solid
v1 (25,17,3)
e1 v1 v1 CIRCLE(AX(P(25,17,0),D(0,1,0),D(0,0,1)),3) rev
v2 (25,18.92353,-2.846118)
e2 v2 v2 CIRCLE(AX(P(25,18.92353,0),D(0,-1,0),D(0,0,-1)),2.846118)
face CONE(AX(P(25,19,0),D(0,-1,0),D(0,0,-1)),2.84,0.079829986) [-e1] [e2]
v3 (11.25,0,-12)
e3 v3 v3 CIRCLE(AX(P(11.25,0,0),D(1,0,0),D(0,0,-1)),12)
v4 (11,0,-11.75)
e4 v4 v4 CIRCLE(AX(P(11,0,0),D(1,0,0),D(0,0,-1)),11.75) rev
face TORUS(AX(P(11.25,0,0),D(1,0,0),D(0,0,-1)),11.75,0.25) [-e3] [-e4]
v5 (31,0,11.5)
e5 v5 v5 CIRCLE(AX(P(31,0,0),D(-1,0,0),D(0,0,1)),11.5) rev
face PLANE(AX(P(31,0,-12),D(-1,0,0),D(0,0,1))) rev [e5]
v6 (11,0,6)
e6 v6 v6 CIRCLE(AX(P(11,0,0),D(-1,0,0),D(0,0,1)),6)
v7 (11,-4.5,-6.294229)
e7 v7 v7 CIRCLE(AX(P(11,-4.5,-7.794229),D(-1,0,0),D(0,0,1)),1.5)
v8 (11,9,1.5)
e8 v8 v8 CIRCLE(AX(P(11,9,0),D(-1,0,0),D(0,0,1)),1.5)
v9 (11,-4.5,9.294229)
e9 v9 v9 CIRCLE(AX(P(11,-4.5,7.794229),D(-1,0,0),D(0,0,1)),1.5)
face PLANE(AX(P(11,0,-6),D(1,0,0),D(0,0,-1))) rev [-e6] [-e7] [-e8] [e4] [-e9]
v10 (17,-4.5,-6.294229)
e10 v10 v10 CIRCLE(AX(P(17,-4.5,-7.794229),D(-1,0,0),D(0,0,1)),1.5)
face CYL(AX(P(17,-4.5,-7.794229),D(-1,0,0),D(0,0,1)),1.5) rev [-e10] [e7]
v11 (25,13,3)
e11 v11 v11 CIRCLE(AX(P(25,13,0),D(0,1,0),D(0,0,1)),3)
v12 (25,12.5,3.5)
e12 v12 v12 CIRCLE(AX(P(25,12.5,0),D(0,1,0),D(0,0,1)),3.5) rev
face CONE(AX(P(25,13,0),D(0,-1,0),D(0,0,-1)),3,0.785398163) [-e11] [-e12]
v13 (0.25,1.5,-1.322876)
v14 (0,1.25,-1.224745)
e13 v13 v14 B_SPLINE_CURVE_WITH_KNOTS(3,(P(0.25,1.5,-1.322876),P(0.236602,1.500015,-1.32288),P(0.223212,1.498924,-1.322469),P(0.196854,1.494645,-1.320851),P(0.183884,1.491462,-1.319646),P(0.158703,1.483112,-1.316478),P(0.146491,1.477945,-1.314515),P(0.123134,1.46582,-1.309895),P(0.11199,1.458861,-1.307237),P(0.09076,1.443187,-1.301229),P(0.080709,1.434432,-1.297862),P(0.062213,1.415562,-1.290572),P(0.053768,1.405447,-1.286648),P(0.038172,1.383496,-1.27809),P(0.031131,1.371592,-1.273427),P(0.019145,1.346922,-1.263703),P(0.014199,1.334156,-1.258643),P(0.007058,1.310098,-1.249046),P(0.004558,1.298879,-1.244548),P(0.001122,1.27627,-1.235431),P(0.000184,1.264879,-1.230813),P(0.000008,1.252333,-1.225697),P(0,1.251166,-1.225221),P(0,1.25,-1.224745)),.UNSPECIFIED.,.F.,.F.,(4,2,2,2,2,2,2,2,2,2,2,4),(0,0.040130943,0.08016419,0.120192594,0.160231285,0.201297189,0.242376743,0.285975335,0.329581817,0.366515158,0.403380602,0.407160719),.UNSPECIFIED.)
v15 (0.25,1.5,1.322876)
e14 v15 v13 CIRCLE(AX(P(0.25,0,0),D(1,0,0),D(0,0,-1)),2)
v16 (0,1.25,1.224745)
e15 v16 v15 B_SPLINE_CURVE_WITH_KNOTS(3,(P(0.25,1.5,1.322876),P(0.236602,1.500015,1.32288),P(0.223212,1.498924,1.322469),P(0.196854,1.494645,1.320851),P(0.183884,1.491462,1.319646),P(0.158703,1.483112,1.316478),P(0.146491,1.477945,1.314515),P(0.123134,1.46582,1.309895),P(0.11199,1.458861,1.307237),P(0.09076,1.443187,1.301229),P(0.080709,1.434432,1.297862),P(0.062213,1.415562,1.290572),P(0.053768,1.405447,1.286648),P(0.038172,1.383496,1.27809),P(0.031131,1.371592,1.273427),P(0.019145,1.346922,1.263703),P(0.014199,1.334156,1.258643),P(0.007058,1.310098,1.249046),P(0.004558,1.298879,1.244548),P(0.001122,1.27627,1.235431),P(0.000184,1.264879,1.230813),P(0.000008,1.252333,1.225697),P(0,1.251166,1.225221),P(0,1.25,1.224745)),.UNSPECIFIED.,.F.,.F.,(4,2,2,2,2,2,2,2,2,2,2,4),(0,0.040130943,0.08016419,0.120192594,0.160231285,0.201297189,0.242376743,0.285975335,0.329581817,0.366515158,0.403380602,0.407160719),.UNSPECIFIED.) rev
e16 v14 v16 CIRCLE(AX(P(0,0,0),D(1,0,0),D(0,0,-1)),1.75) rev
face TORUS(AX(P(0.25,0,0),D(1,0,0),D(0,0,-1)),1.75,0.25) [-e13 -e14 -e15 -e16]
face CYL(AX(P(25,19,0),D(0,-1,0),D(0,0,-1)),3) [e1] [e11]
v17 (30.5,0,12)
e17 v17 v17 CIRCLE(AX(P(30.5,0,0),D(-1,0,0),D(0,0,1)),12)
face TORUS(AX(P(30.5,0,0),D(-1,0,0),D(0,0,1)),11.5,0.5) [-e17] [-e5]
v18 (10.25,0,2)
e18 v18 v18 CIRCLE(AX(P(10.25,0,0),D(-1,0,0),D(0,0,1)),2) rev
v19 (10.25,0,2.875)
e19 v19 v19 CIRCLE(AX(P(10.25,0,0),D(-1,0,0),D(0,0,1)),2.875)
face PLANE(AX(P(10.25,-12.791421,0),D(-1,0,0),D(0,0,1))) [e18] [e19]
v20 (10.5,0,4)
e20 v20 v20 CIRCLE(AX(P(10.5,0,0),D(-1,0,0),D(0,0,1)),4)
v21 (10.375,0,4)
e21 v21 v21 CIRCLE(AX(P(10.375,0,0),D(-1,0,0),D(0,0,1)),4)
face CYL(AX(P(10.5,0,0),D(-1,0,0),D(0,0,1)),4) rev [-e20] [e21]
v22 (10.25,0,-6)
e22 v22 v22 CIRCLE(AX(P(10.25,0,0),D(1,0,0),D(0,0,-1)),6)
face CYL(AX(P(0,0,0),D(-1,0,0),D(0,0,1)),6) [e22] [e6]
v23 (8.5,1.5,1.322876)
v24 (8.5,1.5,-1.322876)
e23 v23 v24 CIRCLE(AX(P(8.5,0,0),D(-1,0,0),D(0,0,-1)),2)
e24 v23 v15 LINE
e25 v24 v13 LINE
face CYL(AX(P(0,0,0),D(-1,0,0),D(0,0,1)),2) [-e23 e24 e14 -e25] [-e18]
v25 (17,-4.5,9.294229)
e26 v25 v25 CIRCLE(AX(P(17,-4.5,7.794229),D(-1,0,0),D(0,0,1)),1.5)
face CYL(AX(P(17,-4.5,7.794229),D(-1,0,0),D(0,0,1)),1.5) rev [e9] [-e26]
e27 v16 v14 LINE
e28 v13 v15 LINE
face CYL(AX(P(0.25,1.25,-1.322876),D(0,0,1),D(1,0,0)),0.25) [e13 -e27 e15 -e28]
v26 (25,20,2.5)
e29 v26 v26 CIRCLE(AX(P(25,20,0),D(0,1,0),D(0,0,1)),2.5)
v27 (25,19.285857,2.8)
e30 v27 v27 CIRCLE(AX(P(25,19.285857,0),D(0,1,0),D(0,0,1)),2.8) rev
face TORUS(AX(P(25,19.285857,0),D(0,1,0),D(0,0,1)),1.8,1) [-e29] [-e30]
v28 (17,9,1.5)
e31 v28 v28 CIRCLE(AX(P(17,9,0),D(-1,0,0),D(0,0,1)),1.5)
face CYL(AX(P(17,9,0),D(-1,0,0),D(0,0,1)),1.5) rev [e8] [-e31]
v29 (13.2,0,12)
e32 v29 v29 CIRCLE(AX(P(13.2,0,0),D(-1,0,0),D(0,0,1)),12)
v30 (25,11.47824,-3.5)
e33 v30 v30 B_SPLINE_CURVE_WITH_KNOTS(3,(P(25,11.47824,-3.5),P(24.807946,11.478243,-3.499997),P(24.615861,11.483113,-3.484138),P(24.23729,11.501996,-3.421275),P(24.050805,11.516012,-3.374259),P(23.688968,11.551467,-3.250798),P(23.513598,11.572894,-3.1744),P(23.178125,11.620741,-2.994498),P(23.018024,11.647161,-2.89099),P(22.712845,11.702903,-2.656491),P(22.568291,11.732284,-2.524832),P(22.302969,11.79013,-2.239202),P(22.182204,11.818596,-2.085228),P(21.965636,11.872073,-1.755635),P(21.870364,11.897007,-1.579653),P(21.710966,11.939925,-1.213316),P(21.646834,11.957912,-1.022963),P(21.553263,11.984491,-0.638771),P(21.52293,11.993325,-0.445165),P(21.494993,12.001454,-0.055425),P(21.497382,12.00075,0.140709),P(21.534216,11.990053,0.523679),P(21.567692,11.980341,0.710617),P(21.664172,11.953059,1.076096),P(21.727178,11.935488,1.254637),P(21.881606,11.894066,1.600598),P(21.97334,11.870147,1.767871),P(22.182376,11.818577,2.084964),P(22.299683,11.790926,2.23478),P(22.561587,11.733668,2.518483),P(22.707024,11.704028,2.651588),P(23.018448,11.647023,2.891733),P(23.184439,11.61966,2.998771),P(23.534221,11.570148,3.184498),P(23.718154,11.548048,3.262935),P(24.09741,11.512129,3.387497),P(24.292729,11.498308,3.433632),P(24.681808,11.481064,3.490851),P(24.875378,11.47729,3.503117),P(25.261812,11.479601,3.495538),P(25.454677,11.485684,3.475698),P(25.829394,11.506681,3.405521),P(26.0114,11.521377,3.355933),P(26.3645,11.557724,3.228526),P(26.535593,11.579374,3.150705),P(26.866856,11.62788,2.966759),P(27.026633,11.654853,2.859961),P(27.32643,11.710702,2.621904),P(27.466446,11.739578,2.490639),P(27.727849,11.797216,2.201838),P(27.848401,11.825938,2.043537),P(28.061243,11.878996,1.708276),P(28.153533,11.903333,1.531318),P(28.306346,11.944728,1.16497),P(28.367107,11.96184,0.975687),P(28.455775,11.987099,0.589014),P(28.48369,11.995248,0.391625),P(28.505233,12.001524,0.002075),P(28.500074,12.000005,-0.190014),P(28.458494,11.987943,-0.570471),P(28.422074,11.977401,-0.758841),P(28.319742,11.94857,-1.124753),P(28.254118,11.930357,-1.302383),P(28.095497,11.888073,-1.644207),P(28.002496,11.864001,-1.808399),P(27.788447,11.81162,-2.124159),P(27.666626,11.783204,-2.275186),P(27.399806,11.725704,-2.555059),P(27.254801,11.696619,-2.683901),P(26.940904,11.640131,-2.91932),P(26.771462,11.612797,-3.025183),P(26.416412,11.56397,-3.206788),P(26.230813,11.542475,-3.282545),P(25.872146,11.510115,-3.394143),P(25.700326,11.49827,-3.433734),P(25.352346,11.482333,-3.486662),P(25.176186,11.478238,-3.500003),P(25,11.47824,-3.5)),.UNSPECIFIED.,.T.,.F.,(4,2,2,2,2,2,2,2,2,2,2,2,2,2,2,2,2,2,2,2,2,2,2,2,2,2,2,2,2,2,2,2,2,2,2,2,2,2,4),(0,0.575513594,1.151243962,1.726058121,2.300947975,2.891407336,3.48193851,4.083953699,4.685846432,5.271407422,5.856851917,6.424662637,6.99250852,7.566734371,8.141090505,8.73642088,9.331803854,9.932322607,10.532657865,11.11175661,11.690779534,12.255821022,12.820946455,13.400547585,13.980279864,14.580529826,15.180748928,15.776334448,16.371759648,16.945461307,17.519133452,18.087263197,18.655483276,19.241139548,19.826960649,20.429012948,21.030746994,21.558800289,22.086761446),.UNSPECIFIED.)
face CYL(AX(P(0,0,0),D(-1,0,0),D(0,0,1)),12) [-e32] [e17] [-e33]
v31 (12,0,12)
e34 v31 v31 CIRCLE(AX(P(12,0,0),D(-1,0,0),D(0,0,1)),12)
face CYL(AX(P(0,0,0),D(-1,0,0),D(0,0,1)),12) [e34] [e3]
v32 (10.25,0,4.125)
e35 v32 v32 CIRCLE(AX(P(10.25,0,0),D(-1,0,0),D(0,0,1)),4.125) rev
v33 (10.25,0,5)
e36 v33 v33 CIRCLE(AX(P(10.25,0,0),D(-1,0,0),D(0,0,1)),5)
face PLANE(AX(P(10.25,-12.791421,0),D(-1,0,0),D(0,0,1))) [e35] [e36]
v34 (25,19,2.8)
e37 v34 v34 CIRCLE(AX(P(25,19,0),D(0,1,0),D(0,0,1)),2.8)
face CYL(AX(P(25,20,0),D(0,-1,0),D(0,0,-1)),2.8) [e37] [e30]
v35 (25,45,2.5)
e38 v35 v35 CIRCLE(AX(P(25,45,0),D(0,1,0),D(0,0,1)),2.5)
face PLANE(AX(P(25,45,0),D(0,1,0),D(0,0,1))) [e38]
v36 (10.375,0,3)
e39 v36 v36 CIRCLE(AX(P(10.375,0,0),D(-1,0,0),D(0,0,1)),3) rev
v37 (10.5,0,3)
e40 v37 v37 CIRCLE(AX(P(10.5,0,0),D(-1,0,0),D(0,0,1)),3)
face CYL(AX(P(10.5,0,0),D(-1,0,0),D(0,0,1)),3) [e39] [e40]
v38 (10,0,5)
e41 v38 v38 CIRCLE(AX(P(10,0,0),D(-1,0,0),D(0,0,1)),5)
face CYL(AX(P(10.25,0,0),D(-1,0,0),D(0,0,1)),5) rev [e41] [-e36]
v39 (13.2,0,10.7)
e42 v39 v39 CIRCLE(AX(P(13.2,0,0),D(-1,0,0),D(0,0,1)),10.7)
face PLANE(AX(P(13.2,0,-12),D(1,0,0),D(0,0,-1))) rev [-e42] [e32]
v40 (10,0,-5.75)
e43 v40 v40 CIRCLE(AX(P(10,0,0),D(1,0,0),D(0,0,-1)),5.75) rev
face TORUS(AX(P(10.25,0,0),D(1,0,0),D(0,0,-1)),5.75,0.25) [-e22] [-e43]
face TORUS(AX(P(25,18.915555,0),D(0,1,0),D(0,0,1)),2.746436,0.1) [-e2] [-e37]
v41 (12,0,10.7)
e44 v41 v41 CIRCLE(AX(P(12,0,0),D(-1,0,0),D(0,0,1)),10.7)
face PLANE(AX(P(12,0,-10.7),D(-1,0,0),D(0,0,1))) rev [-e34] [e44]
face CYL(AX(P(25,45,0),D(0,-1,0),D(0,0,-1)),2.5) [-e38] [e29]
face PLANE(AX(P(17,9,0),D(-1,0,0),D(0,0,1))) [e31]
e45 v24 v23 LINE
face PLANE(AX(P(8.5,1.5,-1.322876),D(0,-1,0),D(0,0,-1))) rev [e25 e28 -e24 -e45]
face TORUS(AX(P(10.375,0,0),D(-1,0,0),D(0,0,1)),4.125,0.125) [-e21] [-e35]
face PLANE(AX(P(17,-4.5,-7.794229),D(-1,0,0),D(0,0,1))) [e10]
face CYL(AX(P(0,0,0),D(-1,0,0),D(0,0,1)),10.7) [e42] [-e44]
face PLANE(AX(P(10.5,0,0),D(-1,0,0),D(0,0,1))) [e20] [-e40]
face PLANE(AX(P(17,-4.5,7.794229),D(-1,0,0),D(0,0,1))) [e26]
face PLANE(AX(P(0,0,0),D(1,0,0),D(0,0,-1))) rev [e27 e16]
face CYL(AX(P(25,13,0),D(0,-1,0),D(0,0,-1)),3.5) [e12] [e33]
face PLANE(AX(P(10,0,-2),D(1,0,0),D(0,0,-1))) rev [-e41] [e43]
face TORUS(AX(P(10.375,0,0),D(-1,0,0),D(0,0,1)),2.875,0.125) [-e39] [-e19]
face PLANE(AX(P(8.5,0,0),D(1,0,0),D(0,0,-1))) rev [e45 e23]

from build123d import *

# Parameters (mm, degrees)
ESQUISSE2_R             = 3.5
BOSS_EXTRU_1_DEPTH      = 13
ESQUISSE3_R             = 3
BOSS_EXTRU_2_DEPTH      = 6
ESQUISSE4_R             = 2.8
BOSS_EXTRU_3_DEPTH      = 1
ESQUISSE5_R             = 2.5
BOSS_EXTRU_4_DEPTH      = 25
CHANFREIN1_SIZE         = 0.5
CHANFREIN2_SIZE         = 2
CHANFREIN2_SIZE2        = 0.16
CONG_1_R                = 1
CONG_2_R                = 0.1
ENL_V_MAT_EXTRU_2_DEPTH = 8.5
CONG_3_R                = 0.5
CONG_4_R                = 0.25
CONG_5_R                = 0.25
ESQUISSE9_R             = 5
ESQUISSE9_R_2           = 4
ESQUISSE9_R_3           = 3
ESQUISSE9_R_4           = 2
ENL_V_MAT_EXTRU_4_DEPTH = 0.25
ESQUISSE10_R            = 4
ESQUISSE10_R_2          = 3
ENL_V_MAT_EXTRU_5_DEPTH = 0.5
CONG_6_R                = 0.125
ESQUISSE8_R             = 1.5
ENL_V_MAT_EXTRU_3_DEPTH = 6


# Some blends are built 0.0001 mm under size
with BuildPart() as part:
    # Esquisse1 → Révolution1 (revolve)
    with BuildSketch(Plane(origin=(0, 0, 0), x_dir=(1, 0, 0), z_dir=(0, 1, 0)), mode=Mode.PRIVATE) as r_volution1_sk:
        Polygon((12, 10.7), (12, 12), (11, 12), (11, 6), (10, 6), (10, 2), (0, 2), (0, 0), (31, 0), (31, 12), (13.2, 12), (13.2, 10.7), align=None)
    revolve(r_volution1_sk.sketch.rotate(Axis((0, 0, 0), (1, 0, 0)), 180), axis=Axis((0, 0, 0), (1, 0, 0)))

    # Esquisse2 → Boss.-Extru.1 (add)
    with BuildSketch(Plane(origin=(0, 0, 0), x_dir=(1, 0, 0), z_dir=(0, 1, 0))):
        with Locations(Location((25, 0, 0), (0, 0, 90))):
            Circle(ESQUISSE2_R)
    extrude(amount=BOSS_EXTRU_1_DEPTH)

    # Esquisse3 → Boss.-Extru.2 (add)
    with BuildSketch(Plane(origin=(0, 13, 0), x_dir=(1, 0, 0), z_dir=(0, 1, 0))):
        with Locations(Location((25, 0, 0), (0, 0, 270))):
            Circle(ESQUISSE3_R)
    extrude(amount=BOSS_EXTRU_2_DEPTH)

    # Esquisse4 → Boss.-Extru.3 (add)
    with BuildSketch(Plane(origin=(0, 19, 0), x_dir=(1, 0, 0), z_dir=(0, 1, 0))):
        with Locations(Location((25, 0, 0), (0, 0, 270))):
            Circle(ESQUISSE4_R)
    extrude(amount=BOSS_EXTRU_3_DEPTH)

    # Esquisse5 → Boss.-Extru.4 (add)
    with BuildSketch(Plane(origin=(0, 20, 0), x_dir=(1, 0, 0), z_dir=(0, 1, 0))):
        with Locations(Location((25, 0, 0), (0, 0, 270))):
            Circle(ESQUISSE5_R)
    extrude(amount=BOSS_EXTRU_4_DEPTH)

    # Chanfrein1
    chanfrein1_edges = [part.edges().sort_by_distance(p)[0] for p in [
        (25, 13, 3.5),
    ]]
    chamfer(chanfrein1_edges, length=CHANFREIN1_SIZE - 0.0001)  # a hair under: the kernel refuses the full size

    # Chanfrein2
    chanfrein2_edges = [part.edges().sort_by_distance(p)[0] for p in [
        (25, 19, -3),
    ]]
    chanfrein2_side = [part.faces().sort_by_distance(p)[0] for p in [
        (25, 16, -3),
    ]]
    chamfer(chanfrein2_edges, length=CHANFREIN2_SIZE, length2=CHANFREIN2_SIZE2, reference=chanfrein2_side[0])

    # Congé1
    # the kernel refuses this fillet: 1 mm, written as the material it takes off along each edge
    with BuildSketch(Plane(origin=(25, 20, 0), x_dir=(0, 0, 1), z_dir=(-1, 0, 0))) as cong_1_piece_1:
        with BuildLine():
            CenterArc((1.8, -0.714142843), CONG_1_R, 0, 45.572995999)
            Line((2.5, 0), (2.514, 0.014282857))
            ThreePointArc((2.514, 0.014282857), (2.65, 0.02), (2.8, 0.02))
            Line((2.8, 0.02), (2.82, 0))
            Line((2.82, 0), (2.82, -0.714142843))
            Line((2.82, -0.714142843), (2.8, -0.714142843))
        make_face()
    revolve(axis=Axis((25, 20, 0), (0, 1, 0)), mode=Mode.SUBTRACT)

    # Congé2
    # the kernel refuses this fillet: 0.1 mm, written as the material it takes off along each edge
    with BuildSketch(Plane(origin=(25, 19, 0), x_dir=(0, 0, 1), z_dir=(-1, 0, 0))) as cong_2_piece_1:
        with BuildLine():
            CenterArc((2.746436086, -0.084444699), CONG_2_R, 4.57392126, 53.038812221)
            Line((2.8, 0), (2.801071278, 0.001688894))
            ThreePointArc((2.801071278, 0.001688894), (2.82, 0.002), (2.84, 0.002))
            Line((2.84, 0.002), (2.841993631, 0.00015949))
            Line((2.841993631, 0.00015949), (2.848111245, -0.076310686))
            Line((2.848111245, -0.076310686), (2.846117614, -0.076470177))
        make_face()
    revolve(axis=Axis((25, 19, 0), (0, 1, 0)), mode=Mode.SUBTRACT)

    # Esquisse7 → Enlèv. mat.-Extru.2 (cut)
    with BuildSketch(Plane.ZY):
        with BuildLine():
            Line((-1.322875656, 1.5), (1.322875656, 1.5))
            ThreePointArc((1.322875656, 1.5), (0, 2), (-1.322875656, 1.5))
        make_face()
    extrude(amount=-ENL_V_MAT_EXTRU_2_DEPTH, mode=Mode.SUBTRACT)

    # Congé3
    cong_3_edges = [part.edges().sort_by_distance(p)[0] for p in [
        (31, 0, -12),
    ]]
    fillet(cong_3_edges, radius=CONG_3_R)

    # Congé4
    cong_4_edges = [part.edges().sort_by_distance(p)[0] for p in [
        (11, 0, -12),
        (10, 0, -6),
    ]]
    fillet(cong_4_edges, radius=CONG_4_R)

    # Congé5
    cong_5_edges = [part.edges().sort_by_distance(p)[0] for p in [
        (0, -1.822875656, -0.822875656),
        (0, 1.5, 0),
    ]]
    fillet(cong_5_edges, radius=CONG_5_R)

    # Esquisse9 → Enlèv. mat.-Extru.4 (cut)
    # profile 1 of 2: a face of its own
    with BuildSketch(Plane.ZY.offset(-10)):
        Circle(ESQUISSE9_R)
        Circle(ESQUISSE9_R_2, mode=Mode.SUBTRACT)
    # profile 2 of 2: a face of its own
    with BuildSketch(Plane.ZY.offset(-10)):
        Circle(ESQUISSE9_R_3)
        Circle(ESQUISSE9_R_4, mode=Mode.SUBTRACT)
    extrude(amount=-ENL_V_MAT_EXTRU_4_DEPTH, mode=Mode.SUBTRACT)

    # Esquisse10 → Enlèv. mat.-Extru.5 (cut)
    with BuildSketch(Plane.ZY.offset(-10)):
        Circle(ESQUISSE10_R)
        Circle(ESQUISSE10_R_2, mode=Mode.SUBTRACT)
    extrude(amount=-ENL_V_MAT_EXTRU_5_DEPTH, mode=Mode.SUBTRACT)

    # Congé6
    cong_6_edges = [part.edges().sort_by_distance(p)[0] for p in [
        (10.25, 0, -4),
        (10.25, 0, -3),
    ]]
    fillet(cong_6_edges, radius=CONG_6_R)

    # Esquisse8 → Enlèv. mat.-Extru.3 (cut)
    with BuildSketch(Plane.ZY.offset(-11)):
        with Locations((0, 9)):
            Circle(ESQUISSE8_R)
        with Locations((7.794228634, -4.5)):
            Circle(ESQUISSE8_R)
        with Locations((-7.794228634, -4.5)):
            Circle(ESQUISSE8_R)
    extrude(amount=-ENL_V_MAT_EXTRU_3_DEPTH, mode=Mode.SUBTRACT)


solid = part.part
